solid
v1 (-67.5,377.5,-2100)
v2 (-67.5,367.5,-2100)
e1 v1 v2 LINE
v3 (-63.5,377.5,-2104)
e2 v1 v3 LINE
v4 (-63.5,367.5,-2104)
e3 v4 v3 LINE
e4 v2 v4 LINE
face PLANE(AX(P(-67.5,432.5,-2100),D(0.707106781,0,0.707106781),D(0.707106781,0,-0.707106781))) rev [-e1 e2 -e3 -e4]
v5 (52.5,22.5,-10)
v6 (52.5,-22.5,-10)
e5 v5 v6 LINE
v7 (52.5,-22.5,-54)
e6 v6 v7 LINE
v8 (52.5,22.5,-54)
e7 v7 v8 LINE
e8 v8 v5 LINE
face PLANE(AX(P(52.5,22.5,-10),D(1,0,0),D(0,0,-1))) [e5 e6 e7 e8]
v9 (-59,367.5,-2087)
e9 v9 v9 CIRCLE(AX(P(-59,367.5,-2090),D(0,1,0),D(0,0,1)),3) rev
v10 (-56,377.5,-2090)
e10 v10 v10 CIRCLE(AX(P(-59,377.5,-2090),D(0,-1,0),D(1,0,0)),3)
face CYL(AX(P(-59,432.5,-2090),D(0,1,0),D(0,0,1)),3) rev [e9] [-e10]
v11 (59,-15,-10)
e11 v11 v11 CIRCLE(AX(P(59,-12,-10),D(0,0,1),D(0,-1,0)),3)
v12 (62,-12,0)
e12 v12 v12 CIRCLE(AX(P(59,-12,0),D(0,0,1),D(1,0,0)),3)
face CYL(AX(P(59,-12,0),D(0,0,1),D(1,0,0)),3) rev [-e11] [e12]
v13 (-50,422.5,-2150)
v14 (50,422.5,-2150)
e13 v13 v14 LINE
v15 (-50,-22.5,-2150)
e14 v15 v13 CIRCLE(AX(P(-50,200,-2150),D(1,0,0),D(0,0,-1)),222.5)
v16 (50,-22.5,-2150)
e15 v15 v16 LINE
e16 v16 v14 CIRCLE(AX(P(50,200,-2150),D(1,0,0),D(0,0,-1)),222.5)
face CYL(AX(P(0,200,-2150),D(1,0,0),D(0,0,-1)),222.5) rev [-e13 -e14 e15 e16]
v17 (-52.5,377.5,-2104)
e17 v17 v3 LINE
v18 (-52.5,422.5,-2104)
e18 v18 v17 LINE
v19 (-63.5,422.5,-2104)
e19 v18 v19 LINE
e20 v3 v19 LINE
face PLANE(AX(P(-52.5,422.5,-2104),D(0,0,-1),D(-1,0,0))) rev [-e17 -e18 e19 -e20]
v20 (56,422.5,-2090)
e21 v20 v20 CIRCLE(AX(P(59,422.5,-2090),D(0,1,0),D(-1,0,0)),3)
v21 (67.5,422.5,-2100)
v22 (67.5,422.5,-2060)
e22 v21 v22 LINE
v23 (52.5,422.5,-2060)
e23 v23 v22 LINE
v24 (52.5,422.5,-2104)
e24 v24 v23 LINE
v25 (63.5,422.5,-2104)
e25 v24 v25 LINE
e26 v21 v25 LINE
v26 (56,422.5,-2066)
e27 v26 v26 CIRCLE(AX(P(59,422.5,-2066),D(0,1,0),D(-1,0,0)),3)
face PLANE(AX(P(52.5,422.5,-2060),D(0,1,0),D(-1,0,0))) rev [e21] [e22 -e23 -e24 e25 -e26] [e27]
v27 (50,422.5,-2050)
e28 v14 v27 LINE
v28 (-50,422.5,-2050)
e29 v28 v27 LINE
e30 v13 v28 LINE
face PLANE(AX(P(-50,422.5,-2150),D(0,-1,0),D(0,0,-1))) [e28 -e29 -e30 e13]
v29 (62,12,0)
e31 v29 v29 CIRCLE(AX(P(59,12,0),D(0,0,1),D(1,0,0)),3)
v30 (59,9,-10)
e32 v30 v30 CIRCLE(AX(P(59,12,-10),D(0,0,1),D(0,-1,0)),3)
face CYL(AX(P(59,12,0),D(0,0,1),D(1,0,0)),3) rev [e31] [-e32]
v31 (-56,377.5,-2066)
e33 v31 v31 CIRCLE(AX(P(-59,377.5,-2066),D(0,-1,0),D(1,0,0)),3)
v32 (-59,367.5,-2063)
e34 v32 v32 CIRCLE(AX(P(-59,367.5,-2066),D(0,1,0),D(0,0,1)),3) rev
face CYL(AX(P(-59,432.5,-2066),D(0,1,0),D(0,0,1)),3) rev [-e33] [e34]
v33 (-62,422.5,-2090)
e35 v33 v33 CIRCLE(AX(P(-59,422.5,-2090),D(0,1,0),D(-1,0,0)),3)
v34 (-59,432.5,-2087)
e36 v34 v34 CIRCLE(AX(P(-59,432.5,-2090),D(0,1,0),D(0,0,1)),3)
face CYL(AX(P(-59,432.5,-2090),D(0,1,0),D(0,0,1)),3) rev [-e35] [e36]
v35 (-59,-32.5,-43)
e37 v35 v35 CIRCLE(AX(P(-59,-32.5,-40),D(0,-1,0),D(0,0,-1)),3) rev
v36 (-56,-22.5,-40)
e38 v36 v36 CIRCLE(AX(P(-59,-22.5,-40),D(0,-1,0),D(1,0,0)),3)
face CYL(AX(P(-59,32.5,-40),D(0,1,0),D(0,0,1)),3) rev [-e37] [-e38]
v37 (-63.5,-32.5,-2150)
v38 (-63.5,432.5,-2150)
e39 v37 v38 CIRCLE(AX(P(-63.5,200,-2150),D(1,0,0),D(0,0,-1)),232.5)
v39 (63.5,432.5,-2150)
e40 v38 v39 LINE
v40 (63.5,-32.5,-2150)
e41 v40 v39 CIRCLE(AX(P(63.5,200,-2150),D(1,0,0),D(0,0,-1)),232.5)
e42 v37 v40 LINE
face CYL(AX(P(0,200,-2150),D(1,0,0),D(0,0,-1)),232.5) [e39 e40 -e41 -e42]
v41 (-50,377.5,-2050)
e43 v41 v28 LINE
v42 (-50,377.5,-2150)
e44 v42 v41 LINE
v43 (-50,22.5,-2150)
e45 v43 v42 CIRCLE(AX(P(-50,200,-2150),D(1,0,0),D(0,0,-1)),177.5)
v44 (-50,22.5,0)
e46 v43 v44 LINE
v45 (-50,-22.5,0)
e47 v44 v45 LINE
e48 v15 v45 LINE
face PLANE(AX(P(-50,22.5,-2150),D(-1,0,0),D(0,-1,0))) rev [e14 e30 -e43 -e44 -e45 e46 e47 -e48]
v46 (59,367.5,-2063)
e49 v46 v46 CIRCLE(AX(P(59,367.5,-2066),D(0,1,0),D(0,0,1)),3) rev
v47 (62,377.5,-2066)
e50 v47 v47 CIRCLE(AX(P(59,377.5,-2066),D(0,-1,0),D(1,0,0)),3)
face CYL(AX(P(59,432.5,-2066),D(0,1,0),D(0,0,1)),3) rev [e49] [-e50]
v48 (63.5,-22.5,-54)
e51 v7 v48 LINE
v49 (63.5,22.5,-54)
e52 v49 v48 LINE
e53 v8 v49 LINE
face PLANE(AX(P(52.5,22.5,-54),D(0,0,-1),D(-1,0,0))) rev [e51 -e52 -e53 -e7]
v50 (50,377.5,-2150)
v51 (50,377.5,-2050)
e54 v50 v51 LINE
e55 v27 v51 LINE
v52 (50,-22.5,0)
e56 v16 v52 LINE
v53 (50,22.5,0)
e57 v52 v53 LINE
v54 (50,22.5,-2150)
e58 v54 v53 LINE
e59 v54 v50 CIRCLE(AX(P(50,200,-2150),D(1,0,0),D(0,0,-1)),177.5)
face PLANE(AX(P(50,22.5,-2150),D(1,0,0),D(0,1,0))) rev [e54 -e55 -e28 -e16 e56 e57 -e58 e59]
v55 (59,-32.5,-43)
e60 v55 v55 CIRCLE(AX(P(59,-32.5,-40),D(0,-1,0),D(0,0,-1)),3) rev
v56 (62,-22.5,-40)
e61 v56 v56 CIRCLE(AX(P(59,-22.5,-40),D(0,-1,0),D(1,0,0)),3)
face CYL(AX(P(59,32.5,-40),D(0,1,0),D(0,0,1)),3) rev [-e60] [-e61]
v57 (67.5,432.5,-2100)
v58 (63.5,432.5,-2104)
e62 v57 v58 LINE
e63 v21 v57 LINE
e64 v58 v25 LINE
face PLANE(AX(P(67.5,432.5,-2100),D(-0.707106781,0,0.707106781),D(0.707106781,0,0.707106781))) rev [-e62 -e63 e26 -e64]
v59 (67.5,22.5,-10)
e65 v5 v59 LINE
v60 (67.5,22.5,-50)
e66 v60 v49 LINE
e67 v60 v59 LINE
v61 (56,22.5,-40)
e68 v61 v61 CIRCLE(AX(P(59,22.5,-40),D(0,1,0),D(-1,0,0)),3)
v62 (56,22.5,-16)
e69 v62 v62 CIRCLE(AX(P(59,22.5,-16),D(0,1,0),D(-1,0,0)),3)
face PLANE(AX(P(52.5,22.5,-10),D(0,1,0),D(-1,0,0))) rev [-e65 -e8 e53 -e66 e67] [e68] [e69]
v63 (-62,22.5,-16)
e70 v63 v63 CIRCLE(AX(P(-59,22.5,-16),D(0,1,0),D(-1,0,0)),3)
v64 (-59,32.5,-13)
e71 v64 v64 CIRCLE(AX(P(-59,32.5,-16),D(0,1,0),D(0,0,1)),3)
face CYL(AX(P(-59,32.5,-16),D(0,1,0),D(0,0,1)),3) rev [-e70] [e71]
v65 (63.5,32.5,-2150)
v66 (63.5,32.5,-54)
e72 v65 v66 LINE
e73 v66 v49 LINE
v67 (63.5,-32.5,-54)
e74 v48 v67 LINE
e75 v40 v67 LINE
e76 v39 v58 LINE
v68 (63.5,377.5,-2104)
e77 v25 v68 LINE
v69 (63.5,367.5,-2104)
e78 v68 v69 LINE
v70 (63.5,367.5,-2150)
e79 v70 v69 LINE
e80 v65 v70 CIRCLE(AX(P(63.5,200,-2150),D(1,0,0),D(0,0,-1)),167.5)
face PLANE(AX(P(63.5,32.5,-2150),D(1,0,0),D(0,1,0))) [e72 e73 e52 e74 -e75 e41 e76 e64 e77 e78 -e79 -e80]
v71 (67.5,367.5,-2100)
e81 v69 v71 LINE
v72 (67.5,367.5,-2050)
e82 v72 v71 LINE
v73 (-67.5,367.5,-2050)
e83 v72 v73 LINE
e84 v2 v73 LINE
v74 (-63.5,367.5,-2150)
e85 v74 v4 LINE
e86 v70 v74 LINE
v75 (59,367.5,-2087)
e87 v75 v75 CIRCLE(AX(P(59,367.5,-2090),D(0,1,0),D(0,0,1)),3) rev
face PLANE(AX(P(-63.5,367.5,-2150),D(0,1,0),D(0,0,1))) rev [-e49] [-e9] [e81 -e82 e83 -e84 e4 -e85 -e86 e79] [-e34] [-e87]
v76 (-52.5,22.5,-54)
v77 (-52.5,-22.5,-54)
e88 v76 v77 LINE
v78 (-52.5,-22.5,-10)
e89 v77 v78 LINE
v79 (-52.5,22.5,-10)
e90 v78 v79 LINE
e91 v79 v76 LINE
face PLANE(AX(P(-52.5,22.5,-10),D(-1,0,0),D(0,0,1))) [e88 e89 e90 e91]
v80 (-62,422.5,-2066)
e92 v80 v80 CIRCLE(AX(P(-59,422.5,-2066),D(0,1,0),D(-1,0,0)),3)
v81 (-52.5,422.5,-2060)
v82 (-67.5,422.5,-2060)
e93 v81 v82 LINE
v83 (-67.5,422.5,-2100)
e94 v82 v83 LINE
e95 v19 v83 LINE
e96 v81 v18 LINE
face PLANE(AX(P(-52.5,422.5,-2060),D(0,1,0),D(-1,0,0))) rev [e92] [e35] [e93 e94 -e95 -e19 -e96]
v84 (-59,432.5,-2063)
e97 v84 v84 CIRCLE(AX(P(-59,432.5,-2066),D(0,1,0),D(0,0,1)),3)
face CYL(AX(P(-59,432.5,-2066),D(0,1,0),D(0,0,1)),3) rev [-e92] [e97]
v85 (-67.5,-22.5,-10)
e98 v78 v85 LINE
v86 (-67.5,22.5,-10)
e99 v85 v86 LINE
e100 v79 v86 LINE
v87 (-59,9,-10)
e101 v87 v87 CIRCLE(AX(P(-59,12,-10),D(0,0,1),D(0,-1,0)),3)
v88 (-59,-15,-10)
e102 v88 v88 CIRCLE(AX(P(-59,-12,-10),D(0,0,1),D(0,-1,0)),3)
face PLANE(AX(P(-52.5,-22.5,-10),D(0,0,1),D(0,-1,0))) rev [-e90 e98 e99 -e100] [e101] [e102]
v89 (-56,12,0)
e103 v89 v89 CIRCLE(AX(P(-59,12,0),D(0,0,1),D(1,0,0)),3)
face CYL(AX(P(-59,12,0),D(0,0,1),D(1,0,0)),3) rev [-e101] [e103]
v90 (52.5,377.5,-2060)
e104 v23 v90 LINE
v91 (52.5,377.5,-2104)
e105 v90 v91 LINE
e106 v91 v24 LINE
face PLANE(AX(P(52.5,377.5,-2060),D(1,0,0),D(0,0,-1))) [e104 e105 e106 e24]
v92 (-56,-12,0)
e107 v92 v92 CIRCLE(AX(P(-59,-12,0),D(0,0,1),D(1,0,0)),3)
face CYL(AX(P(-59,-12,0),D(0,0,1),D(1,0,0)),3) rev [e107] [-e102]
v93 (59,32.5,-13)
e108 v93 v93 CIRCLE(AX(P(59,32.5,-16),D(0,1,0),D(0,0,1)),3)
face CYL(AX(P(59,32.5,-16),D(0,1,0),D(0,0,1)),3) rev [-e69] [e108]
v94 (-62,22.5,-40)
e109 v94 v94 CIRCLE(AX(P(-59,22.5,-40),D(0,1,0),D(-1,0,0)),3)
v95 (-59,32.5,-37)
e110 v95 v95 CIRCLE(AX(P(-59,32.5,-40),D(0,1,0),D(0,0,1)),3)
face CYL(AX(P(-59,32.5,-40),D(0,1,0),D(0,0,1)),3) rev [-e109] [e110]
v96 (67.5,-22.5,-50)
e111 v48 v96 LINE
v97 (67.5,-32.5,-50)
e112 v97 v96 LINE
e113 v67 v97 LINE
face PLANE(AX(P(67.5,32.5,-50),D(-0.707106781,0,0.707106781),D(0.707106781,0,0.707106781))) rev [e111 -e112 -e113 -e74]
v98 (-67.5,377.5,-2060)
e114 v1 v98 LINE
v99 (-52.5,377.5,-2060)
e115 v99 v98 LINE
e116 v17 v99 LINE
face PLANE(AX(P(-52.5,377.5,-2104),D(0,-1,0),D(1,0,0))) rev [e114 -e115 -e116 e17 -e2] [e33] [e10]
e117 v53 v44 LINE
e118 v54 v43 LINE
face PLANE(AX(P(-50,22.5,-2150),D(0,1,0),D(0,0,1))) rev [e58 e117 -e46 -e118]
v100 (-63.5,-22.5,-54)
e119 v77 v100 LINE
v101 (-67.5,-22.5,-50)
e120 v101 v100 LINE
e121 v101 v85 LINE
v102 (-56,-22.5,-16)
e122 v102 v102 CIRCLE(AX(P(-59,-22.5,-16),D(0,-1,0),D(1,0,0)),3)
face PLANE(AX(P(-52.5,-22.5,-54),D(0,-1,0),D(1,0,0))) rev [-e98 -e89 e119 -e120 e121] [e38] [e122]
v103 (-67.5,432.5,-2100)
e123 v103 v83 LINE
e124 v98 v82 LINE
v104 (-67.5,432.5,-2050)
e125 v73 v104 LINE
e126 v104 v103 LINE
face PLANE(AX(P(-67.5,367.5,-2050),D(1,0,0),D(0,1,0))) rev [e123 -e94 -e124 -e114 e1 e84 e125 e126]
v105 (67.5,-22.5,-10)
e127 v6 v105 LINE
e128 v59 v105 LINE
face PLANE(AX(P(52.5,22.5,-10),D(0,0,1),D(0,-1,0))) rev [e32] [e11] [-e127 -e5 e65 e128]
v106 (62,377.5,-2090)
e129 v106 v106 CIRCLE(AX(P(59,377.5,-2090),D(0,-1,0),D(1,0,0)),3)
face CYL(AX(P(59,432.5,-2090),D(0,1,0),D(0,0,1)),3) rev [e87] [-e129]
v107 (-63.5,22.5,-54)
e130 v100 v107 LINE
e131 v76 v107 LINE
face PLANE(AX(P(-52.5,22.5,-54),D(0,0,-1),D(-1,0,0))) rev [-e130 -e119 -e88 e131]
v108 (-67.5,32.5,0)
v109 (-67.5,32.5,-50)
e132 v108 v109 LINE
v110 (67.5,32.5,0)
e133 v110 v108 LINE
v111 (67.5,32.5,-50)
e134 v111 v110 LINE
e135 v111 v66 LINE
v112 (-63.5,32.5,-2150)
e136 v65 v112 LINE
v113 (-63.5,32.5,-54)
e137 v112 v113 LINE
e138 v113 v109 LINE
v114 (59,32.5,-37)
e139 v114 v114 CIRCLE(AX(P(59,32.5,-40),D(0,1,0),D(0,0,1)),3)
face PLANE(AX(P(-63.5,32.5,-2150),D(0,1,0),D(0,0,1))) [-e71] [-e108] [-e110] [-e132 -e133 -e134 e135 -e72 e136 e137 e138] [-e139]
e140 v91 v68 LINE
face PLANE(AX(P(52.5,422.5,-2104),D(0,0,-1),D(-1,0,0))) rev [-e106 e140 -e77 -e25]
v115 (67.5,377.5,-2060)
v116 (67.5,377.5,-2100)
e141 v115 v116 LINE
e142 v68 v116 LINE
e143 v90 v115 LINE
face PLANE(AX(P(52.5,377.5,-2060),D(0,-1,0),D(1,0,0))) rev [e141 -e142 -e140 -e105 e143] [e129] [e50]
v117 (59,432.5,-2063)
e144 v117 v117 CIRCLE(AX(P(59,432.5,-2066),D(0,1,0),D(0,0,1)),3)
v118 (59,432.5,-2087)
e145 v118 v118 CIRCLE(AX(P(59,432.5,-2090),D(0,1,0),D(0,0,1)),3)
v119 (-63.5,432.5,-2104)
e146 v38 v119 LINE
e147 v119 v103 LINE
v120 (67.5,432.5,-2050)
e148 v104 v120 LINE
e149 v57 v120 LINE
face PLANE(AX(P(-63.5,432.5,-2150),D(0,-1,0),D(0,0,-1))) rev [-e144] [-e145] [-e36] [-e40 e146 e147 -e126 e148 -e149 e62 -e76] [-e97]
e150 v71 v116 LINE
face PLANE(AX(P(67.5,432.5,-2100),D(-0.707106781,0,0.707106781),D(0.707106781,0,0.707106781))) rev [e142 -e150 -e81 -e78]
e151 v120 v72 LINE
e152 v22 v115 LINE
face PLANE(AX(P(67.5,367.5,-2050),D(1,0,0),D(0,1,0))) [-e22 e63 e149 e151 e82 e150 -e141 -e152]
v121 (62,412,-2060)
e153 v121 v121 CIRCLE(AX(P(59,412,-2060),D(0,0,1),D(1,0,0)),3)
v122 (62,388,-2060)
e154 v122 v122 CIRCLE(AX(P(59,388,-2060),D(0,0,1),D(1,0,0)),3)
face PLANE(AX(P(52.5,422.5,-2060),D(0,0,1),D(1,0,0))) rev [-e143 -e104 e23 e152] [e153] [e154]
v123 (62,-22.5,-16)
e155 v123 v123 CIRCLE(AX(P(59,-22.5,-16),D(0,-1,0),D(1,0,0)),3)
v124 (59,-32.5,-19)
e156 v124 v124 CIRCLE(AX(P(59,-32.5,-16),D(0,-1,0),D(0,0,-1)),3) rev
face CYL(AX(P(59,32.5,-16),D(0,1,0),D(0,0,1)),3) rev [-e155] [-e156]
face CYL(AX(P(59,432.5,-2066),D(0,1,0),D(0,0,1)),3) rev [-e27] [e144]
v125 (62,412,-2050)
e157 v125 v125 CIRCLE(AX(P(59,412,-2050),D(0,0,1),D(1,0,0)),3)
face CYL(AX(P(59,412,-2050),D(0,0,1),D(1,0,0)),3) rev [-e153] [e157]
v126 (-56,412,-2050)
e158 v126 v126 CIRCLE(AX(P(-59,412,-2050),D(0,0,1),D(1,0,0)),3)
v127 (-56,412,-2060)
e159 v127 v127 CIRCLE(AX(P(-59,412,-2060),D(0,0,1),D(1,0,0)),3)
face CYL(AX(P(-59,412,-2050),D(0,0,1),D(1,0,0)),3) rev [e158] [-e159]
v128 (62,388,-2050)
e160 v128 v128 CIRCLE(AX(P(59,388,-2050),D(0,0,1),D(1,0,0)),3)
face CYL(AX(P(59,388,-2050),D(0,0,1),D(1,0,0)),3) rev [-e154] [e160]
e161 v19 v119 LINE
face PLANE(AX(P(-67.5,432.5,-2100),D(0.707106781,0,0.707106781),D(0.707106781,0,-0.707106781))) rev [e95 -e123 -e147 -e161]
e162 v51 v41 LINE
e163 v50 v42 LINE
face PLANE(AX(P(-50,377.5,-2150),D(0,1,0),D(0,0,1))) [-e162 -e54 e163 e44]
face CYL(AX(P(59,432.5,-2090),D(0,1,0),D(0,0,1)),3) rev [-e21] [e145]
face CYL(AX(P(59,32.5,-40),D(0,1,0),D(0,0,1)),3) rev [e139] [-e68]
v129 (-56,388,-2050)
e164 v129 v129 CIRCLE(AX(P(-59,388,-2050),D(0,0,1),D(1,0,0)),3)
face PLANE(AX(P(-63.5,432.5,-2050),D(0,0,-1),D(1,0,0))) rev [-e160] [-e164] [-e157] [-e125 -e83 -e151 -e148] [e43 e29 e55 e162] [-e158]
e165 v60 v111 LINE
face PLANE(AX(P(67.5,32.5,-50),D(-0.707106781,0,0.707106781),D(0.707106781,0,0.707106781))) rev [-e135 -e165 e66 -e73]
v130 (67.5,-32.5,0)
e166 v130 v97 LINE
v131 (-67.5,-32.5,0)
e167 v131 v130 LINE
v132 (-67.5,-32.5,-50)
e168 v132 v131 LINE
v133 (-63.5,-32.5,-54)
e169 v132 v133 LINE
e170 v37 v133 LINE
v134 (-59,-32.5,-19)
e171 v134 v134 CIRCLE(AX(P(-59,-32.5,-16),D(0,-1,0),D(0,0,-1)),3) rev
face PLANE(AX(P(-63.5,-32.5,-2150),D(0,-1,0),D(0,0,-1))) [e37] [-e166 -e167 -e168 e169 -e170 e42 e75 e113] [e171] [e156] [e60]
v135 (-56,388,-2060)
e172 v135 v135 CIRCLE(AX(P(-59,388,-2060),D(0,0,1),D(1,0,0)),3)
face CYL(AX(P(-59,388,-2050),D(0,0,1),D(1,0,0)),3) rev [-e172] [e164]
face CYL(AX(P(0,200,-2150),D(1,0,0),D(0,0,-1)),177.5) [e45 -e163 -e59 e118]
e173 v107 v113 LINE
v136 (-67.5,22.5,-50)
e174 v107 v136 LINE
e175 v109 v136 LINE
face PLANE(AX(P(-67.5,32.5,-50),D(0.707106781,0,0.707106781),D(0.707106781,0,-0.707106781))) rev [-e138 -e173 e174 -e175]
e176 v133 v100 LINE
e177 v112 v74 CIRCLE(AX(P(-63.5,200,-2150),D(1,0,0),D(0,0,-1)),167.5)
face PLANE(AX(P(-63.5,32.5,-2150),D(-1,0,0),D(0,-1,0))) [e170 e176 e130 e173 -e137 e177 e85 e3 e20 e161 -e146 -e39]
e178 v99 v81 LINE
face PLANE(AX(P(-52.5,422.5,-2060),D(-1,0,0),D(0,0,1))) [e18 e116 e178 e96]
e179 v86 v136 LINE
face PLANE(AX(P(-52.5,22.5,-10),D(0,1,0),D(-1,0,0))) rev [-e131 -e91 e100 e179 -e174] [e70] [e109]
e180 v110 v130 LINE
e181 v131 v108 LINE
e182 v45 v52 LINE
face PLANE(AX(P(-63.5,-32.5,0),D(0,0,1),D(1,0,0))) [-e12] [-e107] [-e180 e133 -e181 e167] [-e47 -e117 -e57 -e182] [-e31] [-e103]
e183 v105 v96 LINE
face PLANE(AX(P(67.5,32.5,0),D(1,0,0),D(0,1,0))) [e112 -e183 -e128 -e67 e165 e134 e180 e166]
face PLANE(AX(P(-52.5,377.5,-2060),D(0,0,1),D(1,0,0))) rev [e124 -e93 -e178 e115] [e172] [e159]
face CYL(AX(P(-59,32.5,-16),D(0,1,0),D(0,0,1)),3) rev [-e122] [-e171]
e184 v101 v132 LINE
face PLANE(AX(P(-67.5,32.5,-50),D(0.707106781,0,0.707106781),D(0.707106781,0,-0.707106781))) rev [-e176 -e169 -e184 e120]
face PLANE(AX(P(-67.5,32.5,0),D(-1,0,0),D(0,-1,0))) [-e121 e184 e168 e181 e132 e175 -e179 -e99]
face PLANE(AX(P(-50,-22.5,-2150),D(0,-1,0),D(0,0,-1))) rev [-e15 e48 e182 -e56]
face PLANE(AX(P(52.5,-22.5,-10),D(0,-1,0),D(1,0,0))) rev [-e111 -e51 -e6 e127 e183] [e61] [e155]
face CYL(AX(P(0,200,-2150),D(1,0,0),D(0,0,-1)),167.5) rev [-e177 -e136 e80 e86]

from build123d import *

# Parameters (mm, degrees)
SKETCH_1_W                = 127
SKETCH_1_H                = 65
SKETCH_1_W_2              = 100
SKETCH_1_H_2              = 45
SKETCH_5_W                = 50
SKETCH_5_H                = 65
EXTRUDE_1_DEPTH           = 4
SKETCH_6_W                = 50
SKETCH_6_H                = 65
EXTRUDE_2_DEPTH           = 4
CHAMFER_1_SIZE            = 4
SKETCH_9_W                = 44
SKETCH_9_H                = 45
CUT_EXTRUDE_1_DEPTH       = 15
SKETCH_10_W               = 44
SKETCH_10_H               = 45
CUT_EXTRUDE_2_DEPTH       = 15
HOLE_WIZARD_6_0_6_1_D     = 6
HOLE_WIZARD_6_0_6_2_D     = 6
HOLE_WIZARD_6_0_6_2_DEPTH = 65
HOLE_WIZARD_6_0_6_3_D     = 6
HOLE_WIZARD_6_0_6_3_DEPTH = 10
HOLE_WIZARD_6_0_6_4_D     = 6
HOLE_WIZARD_6_0_6_4_DEPTH = 10


with BuildPart() as part:
    # 掃出1: sweep along a path in 草圖2
    with BuildLine(Plane(origin=(0, 0, 0), x_dir=(0, 0, -1), z_dir=(1, 0, 0))) as sweep_1_path:
        Line((0, 0), (2150, 0))
        ThreePointArc((2150, 0), (2350, 200), (2150, 400))
        Line((2150, 400), (2050, 400))
    # 草圖1 → 掃出1 (sweep)
    with BuildSketch(Plane.XY):
        Rectangle(SKETCH_1_W, SKETCH_1_H)
        Rectangle(SKETCH_1_W_2, SKETCH_1_H_2, mode=Mode.SUBTRACT)
    sweep(path=sweep_1_path.line)

    # 草圖5 → 伸長1 (add)
    with BuildSketch(Plane(origin=(63.5, 0, 0), x_dir=(0, 0, -1), z_dir=(1, 0, 0))):
        with Locations((25, 0)):
            Rectangle(SKETCH_5_W, SKETCH_5_H)
        with Locations((2075, 400)):
            Rectangle(SKETCH_5_W, SKETCH_5_H)
    extrude(amount=EXTRUDE_1_DEPTH)

    # 草圖6 → 伸長2 (add)
    with BuildSketch(Plane.ZY.offset(63.5)):
        with Locations((-2075, 400)):
            Rectangle(SKETCH_6_W, SKETCH_6_H)
        with Locations((-25, 0)):
            Rectangle(SKETCH_6_W, SKETCH_6_H)
    extrude(amount=EXTRUDE_2_DEPTH)

    # 導角1
    chamfer_1_edges = [part.edges().sort_by_distance(p)[0] for p in [
        (63.5, 0, -50),
        (63.5, 400, -2100),
        (-63.5, 400, -2100),
        (-63.5, 0, -50),
    ]]
    chamfer(chamfer_1_edges, length=CHAMFER_1_SIZE - 0.0001)  # a hair under: the kernel refuses the full size

    # 草圖9 → 除料-伸長1 (cut)
    with BuildSketch(Plane(origin=(67.5, 0, 0), x_dir=(0, 0, -1), z_dir=(1, 0, 0))):
        with Locations((32, 0)):
            Rectangle(SKETCH_9_W, SKETCH_9_H)
        with Locations((2082, 400)):
            Rectangle(SKETCH_9_W, SKETCH_9_H)
    extrude(amount=-CUT_EXTRUDE_1_DEPTH, mode=Mode.SUBTRACT)

    # 草圖10 → 除料-伸長2 (cut)
    with BuildSketch(Plane.ZY.offset(67.5)):
        with Locations((-2082, 400)):
            Rectangle(SKETCH_10_W, SKETCH_10_H)
        with Locations((-32, 0)):
            Rectangle(SKETCH_10_W, SKETCH_10_H)
    extrude(amount=-CUT_EXTRUDE_2_DEPTH, mode=Mode.SUBTRACT)

    # Ø6.0 (6) 直徑孔1 (through all)
    with Locations(Plane(origin=(0, 32.5, 0), x_dir=(-1, 0, 0), z_dir=(0, 1, 0))):
        with Locations((59, -40), (59, -16), (-59, -16), (-59, -40)):
            Hole(HOLE_WIZARD_6_0_6_1_D / 2)

    # Ø6.0 (6) 直徑孔2
    with Locations(Plane(origin=(0, 432.5, 0), x_dir=(-1, 0, 0), z_dir=(0, 1, 0))):
        with Locations((59, -2090), (59, -2066), (-59, -2090), (-59, -2066)):
            Hole(HOLE_WIZARD_6_0_6_2_D / 2, depth=HOLE_WIZARD_6_0_6_2_DEPTH)

    # Ø6.0 (6) 直徑孔3
    with Locations(Plane.XY):
        with Locations((-59, 12), (-59, -12), (59, 12), (59, -12)):
            Hole(HOLE_WIZARD_6_0_6_3_D / 2, depth=HOLE_WIZARD_6_0_6_3_DEPTH)

    # Ø6.0 (6) 直徑孔4
    with Locations(Plane.XY.offset(-2050)):
        with Locations((-59, 412), (-59, 388), (59, 412), (59, 388)):
            Hole(HOLE_WIZARD_6_0_6_4_D / 2, depth=HOLE_WIZARD_6_0_6_4_DEPTH)


solid = part.part
